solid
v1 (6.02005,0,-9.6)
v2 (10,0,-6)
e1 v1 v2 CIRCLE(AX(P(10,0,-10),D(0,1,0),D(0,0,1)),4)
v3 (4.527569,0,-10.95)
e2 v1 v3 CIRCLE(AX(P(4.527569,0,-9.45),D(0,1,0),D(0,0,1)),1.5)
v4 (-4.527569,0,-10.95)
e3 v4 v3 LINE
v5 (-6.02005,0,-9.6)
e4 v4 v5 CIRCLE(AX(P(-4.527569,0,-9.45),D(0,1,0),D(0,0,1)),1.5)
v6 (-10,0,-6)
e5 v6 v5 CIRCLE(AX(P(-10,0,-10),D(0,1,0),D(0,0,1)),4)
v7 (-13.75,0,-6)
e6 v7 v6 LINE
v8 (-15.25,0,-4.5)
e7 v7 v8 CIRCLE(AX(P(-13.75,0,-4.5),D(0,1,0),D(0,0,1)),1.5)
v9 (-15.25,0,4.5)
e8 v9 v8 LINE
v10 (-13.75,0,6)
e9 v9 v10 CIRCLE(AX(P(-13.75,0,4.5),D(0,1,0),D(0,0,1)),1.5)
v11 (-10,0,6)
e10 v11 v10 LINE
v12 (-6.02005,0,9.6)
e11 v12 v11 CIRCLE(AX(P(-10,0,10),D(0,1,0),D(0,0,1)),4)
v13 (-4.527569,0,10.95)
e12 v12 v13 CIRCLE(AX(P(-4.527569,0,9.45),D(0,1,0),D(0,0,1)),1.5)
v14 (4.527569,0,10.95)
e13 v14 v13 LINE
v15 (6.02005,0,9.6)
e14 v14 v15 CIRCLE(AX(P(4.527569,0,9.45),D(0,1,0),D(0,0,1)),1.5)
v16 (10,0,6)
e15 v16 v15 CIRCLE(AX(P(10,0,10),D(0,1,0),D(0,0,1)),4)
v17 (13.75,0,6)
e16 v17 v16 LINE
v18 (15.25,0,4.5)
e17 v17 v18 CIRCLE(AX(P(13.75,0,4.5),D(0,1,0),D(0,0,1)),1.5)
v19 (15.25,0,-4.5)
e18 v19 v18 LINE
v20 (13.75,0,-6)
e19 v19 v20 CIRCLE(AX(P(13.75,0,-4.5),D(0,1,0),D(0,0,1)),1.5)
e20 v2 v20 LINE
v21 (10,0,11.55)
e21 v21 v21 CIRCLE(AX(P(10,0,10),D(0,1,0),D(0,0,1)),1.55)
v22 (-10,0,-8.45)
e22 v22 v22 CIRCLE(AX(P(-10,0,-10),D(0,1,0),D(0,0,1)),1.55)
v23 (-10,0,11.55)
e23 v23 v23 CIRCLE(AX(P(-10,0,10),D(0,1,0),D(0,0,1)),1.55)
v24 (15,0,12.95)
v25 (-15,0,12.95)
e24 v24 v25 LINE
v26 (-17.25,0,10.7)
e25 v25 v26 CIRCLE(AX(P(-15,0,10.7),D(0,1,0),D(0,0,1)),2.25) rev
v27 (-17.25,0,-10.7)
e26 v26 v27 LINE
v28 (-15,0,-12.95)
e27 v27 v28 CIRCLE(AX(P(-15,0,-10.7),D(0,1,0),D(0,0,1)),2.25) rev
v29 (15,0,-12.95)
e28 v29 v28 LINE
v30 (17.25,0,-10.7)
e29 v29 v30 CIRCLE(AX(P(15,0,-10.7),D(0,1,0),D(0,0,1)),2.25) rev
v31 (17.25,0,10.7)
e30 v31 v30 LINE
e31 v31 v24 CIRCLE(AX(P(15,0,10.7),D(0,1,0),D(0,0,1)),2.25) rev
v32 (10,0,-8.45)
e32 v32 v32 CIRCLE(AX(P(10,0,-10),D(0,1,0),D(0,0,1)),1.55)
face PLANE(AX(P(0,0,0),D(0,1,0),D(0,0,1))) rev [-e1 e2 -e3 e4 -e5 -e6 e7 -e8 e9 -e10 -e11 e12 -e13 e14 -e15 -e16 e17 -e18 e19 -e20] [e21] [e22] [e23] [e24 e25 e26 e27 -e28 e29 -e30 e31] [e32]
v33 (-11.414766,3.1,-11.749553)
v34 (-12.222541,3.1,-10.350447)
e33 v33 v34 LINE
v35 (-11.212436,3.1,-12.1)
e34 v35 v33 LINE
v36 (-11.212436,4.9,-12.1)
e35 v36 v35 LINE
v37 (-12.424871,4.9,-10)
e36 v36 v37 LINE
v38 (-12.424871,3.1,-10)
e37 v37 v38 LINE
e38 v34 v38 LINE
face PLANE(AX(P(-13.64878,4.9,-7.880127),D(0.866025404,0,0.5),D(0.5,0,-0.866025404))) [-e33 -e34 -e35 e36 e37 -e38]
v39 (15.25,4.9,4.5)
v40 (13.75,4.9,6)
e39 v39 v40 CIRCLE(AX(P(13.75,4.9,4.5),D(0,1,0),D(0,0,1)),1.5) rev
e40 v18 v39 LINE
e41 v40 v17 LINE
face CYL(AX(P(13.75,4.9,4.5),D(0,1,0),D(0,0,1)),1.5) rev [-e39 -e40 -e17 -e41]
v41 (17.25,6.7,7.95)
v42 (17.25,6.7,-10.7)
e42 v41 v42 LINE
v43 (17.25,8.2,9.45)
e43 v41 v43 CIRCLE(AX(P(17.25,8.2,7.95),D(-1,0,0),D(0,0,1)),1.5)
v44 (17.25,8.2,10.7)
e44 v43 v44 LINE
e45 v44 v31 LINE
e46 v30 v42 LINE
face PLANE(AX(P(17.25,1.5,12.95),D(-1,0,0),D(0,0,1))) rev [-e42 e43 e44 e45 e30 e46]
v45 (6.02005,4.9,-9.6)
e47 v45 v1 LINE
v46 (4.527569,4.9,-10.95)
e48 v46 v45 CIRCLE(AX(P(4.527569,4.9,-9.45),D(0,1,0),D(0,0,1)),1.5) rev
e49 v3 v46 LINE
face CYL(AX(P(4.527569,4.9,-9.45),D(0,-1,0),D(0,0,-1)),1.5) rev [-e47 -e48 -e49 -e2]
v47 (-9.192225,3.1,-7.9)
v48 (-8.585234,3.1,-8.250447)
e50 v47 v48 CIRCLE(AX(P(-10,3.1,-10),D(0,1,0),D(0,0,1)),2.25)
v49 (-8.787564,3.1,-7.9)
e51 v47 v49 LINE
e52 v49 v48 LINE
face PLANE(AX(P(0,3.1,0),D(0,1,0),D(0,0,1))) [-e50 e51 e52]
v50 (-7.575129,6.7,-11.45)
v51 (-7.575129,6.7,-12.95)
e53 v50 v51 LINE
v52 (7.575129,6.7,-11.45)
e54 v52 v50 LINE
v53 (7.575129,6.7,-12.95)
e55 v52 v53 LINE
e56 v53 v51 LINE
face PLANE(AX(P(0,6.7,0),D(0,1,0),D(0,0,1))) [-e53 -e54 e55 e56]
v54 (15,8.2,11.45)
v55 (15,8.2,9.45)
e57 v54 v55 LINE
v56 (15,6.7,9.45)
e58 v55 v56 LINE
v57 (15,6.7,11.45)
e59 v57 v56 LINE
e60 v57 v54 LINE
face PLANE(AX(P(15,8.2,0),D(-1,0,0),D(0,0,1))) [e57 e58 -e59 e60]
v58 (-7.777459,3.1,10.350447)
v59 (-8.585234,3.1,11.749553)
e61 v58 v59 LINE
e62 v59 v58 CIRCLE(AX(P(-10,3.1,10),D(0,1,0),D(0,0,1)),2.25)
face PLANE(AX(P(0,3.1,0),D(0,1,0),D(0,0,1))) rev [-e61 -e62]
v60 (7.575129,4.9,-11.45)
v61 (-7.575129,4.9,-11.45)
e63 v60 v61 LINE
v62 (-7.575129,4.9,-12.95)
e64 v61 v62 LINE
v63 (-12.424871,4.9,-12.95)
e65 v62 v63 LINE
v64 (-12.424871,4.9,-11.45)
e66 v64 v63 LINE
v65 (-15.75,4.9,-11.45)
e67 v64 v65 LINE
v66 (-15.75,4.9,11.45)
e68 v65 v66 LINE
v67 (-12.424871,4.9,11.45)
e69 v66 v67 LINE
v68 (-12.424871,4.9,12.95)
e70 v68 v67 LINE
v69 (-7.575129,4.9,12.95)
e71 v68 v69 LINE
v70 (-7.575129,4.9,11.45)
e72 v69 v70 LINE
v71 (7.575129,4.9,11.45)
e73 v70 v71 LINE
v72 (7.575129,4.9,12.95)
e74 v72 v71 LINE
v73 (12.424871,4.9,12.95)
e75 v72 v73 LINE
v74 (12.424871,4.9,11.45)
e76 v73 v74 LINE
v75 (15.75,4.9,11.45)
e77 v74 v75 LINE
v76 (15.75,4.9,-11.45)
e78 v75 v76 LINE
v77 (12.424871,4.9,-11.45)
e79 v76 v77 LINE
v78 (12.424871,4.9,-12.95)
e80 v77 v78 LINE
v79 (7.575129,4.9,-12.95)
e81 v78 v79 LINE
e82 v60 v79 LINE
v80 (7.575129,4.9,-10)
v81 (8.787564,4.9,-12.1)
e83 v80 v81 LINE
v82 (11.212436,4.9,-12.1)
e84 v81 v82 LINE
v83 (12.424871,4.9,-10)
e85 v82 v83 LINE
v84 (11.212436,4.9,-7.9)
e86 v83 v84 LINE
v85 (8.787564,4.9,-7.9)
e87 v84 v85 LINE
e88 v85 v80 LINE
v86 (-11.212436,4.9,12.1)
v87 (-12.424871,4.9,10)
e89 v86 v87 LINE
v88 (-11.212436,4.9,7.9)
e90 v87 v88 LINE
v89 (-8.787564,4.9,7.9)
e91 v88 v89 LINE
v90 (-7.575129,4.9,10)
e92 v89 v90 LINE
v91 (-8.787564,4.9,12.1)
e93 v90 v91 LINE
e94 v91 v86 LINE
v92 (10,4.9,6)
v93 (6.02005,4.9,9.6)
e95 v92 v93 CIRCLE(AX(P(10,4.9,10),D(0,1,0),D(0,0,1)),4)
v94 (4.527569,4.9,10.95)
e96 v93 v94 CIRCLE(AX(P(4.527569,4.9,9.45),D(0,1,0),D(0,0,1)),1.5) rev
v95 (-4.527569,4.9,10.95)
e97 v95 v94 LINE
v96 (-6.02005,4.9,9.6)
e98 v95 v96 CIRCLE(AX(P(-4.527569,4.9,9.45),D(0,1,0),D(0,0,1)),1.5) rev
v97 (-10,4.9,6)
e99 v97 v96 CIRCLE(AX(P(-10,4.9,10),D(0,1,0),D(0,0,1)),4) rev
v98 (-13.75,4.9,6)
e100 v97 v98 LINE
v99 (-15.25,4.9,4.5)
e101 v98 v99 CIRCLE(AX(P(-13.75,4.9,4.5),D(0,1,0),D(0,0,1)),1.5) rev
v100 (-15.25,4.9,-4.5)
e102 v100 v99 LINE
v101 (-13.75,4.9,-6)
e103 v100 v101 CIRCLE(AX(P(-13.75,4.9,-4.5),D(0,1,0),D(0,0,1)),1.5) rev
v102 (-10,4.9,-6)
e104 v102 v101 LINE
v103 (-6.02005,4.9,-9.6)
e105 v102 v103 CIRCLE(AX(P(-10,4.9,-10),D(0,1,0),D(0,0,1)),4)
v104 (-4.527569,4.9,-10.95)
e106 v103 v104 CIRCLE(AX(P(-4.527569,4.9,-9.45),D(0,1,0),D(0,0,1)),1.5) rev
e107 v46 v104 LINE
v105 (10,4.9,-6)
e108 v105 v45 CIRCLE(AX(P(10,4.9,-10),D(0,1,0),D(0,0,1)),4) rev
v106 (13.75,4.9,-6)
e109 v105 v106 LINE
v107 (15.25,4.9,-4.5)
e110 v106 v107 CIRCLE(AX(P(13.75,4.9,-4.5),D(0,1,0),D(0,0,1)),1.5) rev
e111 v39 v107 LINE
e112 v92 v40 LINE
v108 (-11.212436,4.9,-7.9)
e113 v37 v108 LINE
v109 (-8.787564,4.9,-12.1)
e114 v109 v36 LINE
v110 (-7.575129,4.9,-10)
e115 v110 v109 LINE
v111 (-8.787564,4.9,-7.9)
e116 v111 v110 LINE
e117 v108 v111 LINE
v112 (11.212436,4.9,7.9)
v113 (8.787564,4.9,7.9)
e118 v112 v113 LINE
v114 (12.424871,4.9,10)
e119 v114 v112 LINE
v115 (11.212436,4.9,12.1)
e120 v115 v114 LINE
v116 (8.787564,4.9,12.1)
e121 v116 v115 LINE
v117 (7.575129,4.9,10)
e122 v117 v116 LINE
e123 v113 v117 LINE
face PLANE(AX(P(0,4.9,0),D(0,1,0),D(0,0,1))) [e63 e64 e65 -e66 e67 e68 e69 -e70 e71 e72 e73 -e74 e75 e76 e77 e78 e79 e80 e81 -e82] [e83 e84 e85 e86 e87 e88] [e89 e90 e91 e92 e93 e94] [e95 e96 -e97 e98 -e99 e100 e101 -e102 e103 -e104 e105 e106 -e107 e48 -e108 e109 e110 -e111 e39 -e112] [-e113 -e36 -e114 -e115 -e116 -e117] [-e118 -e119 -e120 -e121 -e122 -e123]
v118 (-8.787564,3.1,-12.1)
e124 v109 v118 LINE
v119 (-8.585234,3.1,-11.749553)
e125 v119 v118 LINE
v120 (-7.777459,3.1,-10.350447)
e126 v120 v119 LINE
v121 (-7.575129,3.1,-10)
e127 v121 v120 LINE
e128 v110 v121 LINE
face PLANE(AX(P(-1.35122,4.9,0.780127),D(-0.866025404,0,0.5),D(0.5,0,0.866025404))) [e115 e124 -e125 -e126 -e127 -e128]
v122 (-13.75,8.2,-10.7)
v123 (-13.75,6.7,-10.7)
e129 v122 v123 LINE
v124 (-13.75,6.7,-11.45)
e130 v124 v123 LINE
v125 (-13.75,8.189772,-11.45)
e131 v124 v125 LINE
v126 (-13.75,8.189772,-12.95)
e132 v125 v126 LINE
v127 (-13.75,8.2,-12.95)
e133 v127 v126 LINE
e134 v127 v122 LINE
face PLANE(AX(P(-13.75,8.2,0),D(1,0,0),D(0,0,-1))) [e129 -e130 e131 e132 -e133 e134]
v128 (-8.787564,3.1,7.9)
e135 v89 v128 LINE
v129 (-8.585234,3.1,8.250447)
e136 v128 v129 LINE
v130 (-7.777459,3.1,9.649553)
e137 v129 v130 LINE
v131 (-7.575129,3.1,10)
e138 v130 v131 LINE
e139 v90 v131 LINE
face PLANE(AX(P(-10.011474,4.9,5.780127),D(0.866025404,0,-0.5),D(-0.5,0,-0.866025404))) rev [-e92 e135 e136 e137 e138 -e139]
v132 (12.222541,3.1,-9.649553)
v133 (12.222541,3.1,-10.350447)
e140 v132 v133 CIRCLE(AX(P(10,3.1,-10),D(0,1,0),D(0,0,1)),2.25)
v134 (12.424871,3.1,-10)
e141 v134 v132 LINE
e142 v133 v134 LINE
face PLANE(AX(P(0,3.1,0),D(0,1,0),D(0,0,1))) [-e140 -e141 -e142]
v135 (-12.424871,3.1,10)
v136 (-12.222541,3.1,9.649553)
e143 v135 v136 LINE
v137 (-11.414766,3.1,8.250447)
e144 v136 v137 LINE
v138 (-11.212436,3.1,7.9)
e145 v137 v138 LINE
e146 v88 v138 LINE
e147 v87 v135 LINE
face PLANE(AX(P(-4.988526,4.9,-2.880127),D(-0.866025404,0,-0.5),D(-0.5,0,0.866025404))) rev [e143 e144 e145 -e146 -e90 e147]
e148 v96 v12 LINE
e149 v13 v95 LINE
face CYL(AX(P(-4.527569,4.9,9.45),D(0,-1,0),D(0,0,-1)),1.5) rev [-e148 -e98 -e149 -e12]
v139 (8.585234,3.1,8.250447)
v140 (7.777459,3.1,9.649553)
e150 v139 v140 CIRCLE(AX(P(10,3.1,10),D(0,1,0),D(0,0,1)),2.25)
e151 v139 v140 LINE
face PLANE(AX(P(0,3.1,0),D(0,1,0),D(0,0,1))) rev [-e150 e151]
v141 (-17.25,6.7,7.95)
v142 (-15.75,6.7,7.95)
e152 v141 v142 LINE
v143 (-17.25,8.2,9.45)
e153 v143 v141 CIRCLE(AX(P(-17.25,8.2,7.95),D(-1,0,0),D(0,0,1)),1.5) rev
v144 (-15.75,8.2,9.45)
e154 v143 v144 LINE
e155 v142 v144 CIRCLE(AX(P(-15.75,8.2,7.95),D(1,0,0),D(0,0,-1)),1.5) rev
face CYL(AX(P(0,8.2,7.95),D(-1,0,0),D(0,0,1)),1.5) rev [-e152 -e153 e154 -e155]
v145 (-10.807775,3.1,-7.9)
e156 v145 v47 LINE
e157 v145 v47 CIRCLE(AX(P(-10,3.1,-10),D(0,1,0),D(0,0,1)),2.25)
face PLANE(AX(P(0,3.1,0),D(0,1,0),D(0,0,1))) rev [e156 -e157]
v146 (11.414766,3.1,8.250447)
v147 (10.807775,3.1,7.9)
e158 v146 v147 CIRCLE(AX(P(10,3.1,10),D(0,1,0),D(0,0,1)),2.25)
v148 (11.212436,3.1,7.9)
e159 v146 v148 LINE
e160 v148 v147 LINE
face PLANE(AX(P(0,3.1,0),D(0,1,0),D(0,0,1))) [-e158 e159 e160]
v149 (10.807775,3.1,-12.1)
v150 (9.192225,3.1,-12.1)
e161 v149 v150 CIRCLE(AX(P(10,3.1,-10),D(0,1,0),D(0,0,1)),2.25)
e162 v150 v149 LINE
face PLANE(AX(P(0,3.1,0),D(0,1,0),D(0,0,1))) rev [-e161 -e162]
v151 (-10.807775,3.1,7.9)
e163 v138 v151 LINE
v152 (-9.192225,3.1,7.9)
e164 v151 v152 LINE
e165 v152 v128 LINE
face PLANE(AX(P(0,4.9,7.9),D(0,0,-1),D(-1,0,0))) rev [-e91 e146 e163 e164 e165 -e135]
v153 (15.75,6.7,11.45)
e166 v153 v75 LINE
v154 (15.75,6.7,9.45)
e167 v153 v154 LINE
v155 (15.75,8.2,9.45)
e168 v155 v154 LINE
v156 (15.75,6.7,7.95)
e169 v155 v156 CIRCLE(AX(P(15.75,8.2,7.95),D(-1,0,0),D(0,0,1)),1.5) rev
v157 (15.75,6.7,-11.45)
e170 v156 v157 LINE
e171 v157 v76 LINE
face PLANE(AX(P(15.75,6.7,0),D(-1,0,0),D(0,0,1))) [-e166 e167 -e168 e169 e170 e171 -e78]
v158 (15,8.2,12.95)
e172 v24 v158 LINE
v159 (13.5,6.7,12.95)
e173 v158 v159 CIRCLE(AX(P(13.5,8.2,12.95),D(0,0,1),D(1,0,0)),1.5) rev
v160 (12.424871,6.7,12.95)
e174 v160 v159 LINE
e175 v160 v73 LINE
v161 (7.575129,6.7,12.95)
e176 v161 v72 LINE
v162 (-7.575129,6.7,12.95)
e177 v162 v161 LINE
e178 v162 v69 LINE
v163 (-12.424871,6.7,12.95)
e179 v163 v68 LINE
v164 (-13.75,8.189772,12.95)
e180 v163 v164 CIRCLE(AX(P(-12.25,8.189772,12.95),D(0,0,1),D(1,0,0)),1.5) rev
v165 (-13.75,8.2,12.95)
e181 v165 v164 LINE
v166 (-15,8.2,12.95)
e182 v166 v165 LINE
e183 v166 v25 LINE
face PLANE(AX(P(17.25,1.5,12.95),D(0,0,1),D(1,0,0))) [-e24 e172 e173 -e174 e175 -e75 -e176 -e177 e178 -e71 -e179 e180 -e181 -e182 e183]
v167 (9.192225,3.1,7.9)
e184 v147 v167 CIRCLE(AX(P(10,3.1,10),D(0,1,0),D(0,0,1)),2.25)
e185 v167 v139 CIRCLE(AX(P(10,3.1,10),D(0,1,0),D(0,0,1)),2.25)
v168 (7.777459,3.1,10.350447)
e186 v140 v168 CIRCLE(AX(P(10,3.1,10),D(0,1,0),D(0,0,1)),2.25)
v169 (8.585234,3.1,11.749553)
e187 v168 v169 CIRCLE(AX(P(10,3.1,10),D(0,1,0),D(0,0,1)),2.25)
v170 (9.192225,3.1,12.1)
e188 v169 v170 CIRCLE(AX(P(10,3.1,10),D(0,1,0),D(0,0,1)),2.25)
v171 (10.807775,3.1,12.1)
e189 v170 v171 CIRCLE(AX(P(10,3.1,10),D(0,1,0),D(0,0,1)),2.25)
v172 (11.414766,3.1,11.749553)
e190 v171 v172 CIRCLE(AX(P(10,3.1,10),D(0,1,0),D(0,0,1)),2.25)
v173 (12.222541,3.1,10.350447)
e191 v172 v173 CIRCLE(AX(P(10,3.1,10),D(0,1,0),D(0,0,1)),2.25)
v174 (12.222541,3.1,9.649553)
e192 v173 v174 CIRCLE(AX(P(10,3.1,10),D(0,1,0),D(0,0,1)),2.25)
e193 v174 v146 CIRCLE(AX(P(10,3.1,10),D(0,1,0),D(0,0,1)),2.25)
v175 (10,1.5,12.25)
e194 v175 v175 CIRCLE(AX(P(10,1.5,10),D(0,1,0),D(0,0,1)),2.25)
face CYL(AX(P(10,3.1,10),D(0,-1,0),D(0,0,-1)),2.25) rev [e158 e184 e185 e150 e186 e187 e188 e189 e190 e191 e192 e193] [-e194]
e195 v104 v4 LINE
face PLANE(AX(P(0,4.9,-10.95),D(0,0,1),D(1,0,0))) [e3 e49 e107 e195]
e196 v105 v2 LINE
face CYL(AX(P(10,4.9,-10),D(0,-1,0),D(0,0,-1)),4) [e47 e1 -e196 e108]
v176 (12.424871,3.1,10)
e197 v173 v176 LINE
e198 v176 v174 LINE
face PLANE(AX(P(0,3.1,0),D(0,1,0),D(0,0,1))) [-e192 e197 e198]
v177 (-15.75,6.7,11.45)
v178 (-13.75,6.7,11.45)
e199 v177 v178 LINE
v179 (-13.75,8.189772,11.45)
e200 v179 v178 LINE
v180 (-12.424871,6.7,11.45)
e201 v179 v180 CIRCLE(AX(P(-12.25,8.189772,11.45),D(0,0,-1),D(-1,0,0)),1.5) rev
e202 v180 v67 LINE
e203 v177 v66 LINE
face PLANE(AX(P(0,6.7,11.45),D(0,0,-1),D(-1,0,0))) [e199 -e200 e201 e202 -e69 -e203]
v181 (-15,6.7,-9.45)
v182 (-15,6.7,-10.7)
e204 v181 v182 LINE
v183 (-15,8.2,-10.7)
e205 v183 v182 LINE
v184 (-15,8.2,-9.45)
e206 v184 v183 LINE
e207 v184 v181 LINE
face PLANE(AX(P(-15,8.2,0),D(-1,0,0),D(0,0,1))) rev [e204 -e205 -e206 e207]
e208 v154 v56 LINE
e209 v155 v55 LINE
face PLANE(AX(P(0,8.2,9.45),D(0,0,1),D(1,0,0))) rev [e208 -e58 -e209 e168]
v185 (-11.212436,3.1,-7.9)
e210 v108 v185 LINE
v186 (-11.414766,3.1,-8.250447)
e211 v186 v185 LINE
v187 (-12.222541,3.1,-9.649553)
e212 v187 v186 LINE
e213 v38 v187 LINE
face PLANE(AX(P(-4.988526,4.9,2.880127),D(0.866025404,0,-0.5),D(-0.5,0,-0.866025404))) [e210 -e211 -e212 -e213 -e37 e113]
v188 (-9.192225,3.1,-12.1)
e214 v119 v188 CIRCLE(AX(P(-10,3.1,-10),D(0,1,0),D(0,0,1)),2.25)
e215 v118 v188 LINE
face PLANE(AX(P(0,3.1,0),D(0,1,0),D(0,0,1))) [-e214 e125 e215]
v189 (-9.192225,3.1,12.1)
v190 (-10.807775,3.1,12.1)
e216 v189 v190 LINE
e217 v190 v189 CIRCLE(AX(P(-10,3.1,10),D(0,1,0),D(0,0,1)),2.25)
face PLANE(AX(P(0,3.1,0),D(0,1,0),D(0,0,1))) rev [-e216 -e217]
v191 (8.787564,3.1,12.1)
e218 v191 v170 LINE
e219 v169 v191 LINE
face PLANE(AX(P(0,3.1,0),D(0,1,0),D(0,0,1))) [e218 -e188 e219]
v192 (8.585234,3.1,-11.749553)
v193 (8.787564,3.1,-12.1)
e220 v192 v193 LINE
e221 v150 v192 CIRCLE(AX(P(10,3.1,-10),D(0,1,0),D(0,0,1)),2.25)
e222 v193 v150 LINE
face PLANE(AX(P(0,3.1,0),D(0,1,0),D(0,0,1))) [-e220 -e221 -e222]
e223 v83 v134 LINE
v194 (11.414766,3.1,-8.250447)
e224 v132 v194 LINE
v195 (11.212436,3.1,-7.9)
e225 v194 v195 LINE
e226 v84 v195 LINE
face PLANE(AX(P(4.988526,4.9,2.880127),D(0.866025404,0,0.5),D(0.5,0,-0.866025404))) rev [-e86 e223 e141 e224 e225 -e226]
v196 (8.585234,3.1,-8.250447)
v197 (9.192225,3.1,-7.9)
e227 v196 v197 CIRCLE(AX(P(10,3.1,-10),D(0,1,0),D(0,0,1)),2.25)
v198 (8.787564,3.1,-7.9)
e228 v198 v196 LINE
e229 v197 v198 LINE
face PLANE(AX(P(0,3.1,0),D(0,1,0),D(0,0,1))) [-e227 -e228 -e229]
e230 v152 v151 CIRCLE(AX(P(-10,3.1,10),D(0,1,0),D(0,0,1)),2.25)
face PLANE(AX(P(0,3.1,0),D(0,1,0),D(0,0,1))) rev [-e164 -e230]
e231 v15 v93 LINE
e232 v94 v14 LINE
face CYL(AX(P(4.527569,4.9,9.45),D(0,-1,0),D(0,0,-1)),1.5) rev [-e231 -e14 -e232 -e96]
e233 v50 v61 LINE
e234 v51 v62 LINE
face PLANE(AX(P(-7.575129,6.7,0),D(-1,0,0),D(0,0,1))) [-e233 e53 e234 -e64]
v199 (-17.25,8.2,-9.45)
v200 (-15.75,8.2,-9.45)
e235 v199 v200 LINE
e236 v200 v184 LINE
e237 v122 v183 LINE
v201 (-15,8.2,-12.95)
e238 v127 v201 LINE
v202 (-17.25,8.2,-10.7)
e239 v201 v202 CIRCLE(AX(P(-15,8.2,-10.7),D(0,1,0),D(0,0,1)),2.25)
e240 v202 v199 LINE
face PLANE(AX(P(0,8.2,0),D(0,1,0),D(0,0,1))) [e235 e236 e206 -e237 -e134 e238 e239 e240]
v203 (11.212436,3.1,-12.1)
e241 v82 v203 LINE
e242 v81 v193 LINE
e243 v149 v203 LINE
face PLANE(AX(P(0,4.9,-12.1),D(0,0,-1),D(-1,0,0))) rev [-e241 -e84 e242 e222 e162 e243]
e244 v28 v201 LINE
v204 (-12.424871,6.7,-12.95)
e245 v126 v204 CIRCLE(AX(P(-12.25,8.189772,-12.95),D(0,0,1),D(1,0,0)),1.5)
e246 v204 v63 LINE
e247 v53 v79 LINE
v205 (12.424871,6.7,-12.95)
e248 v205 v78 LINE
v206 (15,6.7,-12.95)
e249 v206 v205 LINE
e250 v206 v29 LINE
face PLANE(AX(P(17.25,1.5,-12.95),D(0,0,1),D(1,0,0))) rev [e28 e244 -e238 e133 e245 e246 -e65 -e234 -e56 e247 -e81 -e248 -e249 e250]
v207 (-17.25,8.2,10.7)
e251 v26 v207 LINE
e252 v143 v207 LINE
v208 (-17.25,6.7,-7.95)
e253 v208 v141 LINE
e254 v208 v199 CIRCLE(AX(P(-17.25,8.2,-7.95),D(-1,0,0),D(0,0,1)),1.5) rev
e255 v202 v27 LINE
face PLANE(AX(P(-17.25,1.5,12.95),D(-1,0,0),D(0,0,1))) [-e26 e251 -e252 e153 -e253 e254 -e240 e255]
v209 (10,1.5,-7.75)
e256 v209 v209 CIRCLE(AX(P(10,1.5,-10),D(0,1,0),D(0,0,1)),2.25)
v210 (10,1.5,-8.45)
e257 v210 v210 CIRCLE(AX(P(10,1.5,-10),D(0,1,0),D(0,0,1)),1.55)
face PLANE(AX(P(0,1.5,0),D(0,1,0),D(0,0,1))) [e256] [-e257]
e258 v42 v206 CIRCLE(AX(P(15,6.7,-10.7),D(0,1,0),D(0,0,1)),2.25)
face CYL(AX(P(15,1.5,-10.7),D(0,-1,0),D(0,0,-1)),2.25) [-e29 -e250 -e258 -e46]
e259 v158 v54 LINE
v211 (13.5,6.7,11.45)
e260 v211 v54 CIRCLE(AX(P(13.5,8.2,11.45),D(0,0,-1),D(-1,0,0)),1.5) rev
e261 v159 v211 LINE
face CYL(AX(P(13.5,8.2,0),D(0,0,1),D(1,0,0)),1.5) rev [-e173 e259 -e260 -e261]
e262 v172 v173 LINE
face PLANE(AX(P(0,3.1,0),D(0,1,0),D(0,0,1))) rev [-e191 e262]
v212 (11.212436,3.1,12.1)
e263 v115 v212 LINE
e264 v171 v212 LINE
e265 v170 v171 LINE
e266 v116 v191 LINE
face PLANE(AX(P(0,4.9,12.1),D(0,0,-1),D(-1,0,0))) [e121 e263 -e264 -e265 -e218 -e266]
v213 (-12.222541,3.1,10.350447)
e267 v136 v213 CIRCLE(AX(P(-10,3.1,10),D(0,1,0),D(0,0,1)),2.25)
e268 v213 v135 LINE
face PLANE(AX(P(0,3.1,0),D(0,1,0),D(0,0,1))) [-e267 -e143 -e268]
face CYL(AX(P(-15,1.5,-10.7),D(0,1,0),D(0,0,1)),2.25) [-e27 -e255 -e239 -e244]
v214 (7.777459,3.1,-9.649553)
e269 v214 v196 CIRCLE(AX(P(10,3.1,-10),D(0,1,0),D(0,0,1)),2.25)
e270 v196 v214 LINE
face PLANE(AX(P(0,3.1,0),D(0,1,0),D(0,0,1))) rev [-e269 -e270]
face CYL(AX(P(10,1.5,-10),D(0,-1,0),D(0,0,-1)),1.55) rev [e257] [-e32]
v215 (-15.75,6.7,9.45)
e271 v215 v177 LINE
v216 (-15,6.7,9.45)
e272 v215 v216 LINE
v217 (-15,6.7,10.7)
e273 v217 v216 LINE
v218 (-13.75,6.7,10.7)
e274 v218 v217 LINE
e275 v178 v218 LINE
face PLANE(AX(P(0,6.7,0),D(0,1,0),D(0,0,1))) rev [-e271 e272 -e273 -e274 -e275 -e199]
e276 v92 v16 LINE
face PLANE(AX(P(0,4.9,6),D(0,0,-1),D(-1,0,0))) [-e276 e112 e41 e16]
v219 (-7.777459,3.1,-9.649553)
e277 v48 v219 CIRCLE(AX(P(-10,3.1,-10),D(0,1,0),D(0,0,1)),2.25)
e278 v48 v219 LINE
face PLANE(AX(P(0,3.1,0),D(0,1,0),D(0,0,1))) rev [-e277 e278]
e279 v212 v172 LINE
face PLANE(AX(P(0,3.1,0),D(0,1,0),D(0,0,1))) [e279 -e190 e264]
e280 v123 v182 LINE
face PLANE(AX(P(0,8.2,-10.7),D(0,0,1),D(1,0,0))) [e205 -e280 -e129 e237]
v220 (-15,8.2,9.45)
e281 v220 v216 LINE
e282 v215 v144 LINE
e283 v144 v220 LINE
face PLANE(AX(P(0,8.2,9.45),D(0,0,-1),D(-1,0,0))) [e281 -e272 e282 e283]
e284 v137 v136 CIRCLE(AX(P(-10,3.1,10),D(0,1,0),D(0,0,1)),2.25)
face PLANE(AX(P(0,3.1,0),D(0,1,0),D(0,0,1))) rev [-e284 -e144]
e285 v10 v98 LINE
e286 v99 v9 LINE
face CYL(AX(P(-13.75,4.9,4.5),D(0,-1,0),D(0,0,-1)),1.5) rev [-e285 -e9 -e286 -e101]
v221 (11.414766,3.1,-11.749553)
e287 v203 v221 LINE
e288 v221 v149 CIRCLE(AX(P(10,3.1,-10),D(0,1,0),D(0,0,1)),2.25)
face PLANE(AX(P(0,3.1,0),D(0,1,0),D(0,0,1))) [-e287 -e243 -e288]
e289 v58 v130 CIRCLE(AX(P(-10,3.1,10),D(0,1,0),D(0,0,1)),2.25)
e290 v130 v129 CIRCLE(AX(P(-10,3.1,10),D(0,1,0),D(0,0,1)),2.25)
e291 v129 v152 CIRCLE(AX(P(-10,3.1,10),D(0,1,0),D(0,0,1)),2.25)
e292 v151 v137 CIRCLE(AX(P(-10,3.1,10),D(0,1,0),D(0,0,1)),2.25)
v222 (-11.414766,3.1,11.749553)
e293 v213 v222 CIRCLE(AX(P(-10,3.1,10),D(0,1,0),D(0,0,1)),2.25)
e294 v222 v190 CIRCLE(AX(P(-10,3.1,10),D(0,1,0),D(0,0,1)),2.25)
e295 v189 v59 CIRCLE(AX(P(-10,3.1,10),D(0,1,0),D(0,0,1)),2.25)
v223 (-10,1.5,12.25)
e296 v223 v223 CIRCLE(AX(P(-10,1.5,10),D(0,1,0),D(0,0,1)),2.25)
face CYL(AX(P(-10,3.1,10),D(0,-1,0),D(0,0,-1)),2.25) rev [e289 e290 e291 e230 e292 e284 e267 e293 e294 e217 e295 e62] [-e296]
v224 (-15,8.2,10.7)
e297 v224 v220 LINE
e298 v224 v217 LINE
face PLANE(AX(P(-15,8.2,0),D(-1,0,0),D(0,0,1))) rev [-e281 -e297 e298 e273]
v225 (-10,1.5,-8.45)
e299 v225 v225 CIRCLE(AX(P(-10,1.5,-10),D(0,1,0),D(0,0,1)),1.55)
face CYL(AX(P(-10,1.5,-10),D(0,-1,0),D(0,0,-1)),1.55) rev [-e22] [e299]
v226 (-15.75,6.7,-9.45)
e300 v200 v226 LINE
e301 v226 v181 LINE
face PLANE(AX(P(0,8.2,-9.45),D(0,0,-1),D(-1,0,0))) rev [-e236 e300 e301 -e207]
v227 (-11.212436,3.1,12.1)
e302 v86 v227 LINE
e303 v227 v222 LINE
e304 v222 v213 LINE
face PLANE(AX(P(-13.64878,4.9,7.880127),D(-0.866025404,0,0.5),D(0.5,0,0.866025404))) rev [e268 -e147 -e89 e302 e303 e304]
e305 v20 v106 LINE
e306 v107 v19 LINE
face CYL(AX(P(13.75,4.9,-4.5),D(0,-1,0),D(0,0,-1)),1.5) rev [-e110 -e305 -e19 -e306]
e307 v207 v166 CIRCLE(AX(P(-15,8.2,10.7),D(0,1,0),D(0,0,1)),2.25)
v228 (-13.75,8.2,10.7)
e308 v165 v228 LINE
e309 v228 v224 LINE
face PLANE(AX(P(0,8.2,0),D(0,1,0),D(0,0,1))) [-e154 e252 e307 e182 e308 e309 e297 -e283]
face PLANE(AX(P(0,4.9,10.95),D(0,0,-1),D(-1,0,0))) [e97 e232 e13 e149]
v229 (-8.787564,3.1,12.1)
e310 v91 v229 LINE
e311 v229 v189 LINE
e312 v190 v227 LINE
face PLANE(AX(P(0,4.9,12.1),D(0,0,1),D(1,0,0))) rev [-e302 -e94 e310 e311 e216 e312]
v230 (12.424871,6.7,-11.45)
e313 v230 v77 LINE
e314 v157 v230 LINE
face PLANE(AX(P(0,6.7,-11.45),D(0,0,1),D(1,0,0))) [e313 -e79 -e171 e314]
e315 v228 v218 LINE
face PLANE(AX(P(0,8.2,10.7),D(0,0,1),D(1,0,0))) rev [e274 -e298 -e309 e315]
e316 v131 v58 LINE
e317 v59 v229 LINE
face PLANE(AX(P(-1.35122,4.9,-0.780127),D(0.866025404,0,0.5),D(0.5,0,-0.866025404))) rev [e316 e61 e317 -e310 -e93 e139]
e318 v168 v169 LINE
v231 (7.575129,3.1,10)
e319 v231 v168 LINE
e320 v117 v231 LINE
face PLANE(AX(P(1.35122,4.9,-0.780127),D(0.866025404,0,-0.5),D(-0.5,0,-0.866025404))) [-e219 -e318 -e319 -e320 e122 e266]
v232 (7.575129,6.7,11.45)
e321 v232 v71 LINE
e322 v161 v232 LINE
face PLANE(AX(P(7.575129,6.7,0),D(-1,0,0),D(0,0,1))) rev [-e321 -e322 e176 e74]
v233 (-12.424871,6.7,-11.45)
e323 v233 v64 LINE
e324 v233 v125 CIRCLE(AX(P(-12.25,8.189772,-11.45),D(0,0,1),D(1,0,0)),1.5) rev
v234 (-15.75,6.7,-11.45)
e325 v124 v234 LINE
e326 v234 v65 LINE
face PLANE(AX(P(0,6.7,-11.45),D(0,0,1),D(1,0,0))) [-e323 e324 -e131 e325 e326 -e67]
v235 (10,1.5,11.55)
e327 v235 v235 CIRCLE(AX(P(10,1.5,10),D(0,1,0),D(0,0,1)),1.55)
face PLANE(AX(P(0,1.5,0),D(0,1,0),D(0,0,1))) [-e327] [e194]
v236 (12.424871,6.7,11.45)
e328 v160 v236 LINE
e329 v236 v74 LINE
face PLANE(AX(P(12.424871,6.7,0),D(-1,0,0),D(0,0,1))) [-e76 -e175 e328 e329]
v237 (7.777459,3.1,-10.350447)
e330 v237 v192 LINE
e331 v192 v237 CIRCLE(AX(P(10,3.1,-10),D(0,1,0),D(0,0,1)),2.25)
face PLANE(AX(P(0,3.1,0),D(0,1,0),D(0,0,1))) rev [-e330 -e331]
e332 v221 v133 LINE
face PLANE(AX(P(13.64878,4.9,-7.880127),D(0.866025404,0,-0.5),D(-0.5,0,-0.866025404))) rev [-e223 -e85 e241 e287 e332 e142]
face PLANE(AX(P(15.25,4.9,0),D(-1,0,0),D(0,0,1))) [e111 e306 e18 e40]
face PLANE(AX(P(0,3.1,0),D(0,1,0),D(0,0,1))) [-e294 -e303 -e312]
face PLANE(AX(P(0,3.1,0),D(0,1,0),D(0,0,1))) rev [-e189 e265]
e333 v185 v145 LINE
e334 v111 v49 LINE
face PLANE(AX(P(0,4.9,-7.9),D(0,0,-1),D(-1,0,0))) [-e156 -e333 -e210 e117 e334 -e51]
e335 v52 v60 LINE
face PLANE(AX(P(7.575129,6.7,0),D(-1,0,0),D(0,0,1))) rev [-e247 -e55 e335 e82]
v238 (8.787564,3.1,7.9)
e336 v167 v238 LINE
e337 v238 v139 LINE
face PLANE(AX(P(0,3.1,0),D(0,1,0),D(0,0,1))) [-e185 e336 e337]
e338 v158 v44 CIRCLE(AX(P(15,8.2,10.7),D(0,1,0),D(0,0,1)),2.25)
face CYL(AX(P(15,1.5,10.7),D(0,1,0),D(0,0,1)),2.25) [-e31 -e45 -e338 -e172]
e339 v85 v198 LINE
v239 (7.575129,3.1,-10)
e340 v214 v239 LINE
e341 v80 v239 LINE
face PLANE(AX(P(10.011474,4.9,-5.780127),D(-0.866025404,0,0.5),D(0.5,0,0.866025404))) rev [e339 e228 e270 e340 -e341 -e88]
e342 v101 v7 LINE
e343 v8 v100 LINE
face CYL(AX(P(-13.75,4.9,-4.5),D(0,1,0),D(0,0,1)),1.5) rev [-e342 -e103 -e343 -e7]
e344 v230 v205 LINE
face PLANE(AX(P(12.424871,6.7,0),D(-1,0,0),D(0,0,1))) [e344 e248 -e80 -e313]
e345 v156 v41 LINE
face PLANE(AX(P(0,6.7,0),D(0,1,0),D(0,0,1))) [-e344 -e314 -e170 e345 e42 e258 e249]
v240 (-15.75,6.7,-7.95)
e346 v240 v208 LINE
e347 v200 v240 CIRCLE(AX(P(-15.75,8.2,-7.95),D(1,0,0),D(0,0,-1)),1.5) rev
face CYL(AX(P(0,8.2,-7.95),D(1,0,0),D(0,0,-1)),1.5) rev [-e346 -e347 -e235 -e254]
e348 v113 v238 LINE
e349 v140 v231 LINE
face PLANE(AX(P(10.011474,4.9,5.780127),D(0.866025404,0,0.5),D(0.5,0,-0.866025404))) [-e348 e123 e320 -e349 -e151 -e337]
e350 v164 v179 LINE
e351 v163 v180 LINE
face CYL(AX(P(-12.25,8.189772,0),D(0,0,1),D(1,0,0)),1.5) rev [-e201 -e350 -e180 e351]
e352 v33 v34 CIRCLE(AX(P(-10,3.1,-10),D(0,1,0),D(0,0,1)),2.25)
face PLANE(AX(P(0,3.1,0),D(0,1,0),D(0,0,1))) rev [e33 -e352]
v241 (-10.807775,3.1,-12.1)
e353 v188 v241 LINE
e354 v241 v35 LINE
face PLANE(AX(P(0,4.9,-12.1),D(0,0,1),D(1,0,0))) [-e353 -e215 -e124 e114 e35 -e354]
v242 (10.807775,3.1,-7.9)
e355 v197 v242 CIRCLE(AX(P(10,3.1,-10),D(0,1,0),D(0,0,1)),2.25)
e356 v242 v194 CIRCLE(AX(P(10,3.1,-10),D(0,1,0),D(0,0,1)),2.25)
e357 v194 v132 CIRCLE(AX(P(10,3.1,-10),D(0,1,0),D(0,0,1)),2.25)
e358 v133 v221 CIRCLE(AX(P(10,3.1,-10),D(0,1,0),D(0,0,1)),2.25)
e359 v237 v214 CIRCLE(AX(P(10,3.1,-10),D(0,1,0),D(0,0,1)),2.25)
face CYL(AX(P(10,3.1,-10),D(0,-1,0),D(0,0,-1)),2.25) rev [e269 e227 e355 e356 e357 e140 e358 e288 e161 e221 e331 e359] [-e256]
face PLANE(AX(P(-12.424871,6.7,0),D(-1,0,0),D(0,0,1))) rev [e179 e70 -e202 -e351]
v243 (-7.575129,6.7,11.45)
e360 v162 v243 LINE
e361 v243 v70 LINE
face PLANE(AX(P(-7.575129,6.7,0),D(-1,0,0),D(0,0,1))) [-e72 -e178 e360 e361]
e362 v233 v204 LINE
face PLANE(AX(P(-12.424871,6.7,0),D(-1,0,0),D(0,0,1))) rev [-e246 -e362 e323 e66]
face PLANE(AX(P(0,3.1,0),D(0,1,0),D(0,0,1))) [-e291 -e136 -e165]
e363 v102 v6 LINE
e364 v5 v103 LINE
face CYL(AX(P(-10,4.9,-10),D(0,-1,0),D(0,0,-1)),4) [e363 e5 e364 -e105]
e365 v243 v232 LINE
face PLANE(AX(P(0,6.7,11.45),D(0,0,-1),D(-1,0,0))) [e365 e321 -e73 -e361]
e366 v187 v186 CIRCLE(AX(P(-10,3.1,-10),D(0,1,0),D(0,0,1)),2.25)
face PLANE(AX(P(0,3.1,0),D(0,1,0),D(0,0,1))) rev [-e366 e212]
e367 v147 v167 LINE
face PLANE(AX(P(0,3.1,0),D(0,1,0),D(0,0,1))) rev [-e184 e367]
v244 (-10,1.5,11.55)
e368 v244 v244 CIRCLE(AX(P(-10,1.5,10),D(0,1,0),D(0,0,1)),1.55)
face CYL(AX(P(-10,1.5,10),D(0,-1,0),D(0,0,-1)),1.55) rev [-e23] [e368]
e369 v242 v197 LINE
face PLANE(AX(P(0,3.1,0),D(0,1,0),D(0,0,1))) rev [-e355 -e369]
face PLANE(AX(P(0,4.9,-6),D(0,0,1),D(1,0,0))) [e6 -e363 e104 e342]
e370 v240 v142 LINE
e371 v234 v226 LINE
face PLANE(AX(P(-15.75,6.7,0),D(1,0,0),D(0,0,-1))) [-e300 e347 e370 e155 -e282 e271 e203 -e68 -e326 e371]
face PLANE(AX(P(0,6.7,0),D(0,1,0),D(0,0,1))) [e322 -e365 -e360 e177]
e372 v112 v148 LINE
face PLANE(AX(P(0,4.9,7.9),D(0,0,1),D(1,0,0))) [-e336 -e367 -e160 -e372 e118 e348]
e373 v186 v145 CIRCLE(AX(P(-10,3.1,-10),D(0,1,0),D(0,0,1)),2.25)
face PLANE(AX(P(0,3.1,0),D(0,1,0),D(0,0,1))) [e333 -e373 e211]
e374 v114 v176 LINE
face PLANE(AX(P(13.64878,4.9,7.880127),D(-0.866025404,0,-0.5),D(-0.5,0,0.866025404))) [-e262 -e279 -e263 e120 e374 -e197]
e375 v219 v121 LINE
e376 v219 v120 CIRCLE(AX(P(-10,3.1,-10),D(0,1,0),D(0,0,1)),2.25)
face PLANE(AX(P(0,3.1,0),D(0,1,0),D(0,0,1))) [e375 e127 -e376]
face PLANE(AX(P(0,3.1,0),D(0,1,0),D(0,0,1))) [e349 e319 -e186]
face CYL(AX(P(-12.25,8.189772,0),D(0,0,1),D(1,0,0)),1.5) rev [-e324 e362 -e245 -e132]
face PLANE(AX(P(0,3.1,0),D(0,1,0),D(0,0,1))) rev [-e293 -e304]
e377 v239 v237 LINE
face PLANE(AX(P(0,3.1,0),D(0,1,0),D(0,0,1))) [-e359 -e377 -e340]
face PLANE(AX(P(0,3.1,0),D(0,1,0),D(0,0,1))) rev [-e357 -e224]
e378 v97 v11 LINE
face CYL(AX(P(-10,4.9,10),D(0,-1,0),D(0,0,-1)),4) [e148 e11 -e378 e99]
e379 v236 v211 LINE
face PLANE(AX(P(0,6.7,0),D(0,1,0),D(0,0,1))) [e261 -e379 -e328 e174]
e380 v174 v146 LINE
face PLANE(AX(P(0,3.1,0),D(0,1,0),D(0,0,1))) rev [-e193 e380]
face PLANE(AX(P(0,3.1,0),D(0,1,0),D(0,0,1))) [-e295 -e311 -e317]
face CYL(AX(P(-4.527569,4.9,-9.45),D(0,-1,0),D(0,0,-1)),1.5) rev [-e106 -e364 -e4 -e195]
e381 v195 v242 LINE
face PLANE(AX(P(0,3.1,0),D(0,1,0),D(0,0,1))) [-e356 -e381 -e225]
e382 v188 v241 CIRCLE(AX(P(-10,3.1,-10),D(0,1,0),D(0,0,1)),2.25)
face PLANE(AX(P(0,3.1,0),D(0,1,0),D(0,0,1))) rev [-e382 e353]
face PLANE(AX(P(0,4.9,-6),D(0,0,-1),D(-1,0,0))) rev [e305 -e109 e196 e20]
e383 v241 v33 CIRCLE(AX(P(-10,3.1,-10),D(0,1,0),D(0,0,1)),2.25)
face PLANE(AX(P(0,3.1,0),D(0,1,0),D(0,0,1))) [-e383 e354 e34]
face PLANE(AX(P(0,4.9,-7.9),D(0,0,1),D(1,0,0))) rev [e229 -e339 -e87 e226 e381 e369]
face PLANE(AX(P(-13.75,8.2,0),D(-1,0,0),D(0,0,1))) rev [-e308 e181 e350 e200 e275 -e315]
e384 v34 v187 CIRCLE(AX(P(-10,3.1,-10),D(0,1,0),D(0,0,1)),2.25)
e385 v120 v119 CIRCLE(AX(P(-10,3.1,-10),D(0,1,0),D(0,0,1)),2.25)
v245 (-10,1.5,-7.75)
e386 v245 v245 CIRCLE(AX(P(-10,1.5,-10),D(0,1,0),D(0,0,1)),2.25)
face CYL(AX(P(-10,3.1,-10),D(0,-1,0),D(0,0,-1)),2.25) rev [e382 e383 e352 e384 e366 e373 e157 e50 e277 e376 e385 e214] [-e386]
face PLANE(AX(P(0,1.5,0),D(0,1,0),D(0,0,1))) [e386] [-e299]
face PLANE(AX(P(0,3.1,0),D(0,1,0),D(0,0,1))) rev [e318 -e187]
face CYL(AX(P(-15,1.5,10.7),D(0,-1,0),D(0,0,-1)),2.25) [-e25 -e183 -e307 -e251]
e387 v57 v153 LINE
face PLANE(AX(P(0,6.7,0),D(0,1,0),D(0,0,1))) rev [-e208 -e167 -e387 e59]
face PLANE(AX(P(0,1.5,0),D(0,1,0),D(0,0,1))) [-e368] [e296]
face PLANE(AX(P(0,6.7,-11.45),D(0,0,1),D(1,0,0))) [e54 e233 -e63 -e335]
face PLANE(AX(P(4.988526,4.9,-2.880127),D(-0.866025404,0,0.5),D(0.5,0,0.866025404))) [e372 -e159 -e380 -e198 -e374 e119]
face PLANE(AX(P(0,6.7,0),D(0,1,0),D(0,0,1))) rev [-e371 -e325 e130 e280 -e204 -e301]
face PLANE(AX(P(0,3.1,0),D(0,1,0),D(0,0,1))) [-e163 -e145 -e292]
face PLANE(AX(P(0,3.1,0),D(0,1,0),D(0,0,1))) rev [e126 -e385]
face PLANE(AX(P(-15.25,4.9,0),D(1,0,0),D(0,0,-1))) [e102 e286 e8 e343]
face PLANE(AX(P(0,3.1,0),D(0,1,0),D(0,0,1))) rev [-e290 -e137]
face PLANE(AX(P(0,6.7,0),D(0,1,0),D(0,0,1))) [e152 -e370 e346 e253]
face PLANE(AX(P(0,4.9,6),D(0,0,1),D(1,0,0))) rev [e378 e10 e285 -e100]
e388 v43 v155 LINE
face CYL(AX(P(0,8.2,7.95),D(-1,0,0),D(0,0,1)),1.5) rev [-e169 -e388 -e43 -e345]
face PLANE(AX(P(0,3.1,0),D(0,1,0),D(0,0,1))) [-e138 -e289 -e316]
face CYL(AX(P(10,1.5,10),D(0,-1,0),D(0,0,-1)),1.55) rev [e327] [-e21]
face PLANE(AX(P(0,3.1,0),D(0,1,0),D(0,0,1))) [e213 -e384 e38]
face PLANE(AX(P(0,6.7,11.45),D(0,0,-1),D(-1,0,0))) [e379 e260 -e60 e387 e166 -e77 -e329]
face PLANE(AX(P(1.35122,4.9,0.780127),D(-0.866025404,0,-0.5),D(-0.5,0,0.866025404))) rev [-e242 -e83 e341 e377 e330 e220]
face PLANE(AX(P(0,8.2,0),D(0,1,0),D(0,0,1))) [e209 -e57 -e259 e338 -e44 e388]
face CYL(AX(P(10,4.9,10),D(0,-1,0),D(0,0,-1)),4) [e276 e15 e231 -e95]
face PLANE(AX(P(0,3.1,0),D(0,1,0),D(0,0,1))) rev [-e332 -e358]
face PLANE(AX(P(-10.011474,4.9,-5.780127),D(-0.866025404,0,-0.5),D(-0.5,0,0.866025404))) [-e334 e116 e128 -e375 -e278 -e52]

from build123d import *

# Parameters (mm, degrees)
SKETCH1_W           = 34.5
SKETCH1_H           = 25.9
SKETCH1_R           = 1.55
BOSS_EXTRUDE1_DEPTH = 1.5
SKETCH3_W           = 34.5
SKETCH3_H           = 25.9
SKETCH3_R           = 2.25
BOSS_EXTRUDE3_DEPTH = 1.6
SKETCH5_W           = 34.5
SKETCH5_H           = 25.9
BOSS_EXTRUDE4_DEPTH = 1.8
SKETCH6_W           = 15.150257738
SKETCH6_H           = 1.5
BOSS_EXTRUDE5_DEPTH = 1.8
BOSS_EXTRUDE6_DEPTH = 1.5
CUT_EXTRUDE1_REACH  = 24.165
FILLET1_R           = 1.5
FILLET2_R           = 2.25


with BuildPart() as part:
    # Sketch1 → Boss-Extrude1 (new body)
    with BuildSketch(Plane(origin=(0, 0, 0), x_dir=(1, 0, 0), z_dir=(0, 1, 0))):
        Rectangle(SKETCH1_W, SKETCH1_H)
        with Locations(Location((-10, 10, 0), (0, 0, 270))):
            Circle(SKETCH1_R, mode=Mode.SUBTRACT)
        with Locations(Location((10, 10, 0), (0, 0, 270))):
            Circle(SKETCH1_R, mode=Mode.SUBTRACT)
        with Locations(Location((10, -10, 0), (0, 0, 270))):
            Circle(SKETCH1_R, mode=Mode.SUBTRACT)
        with Locations(Location((-10, -10, 0), (0, 0, 270))):
            Circle(SKETCH1_R, mode=Mode.SUBTRACT)
    extrude(amount=BOSS_EXTRUDE1_DEPTH)

    # Sketch3 → Boss-Extrude3 (add)
    with BuildSketch(Plane(origin=(0, 1.5, 0), x_dir=(1, 0, 0), z_dir=(0, 1, 0))):
        Rectangle(SKETCH3_W, SKETCH3_H)
        with Locations(Location((-10, 10, 0), (0, 0, 270))):
            Circle(SKETCH3_R, mode=Mode.SUBTRACT)
        with Locations(Location((10, 10, 0), (0, 0, 270))):
            Circle(SKETCH3_R, mode=Mode.SUBTRACT)
        with Locations(Location((10, -10, 0), (0, 0, 270))):
            Circle(SKETCH3_R, mode=Mode.SUBTRACT)
        with Locations(Location((-10, -10, 0), (0, 0, 270))):
            Circle(SKETCH3_R, mode=Mode.SUBTRACT)
    extrude(amount=BOSS_EXTRUDE3_DEPTH)

    # Sketch5 → Boss-Extrude4 (add)
    with BuildSketch(Plane(origin=(0, 3.1, 0), x_dir=(1, 0, 0), z_dir=(0, 1, 0))):
        Rectangle(SKETCH5_W, SKETCH5_H)
        with BuildLine():
            Line((-6, -10.95), (-6, -10))
            ThreePointArc((-6, -10), (-7.171572875, -7.171572875), (-10, -6))
            Line((-10, -6), (-15.25, -6))
            Line((-15.25, -6), (-15.25, 6))
            Line((-15.25, 6), (-10, 6))
            ThreePointArc((-10, 6), (-7.171572875, 7.171572875), (-6, 10))
            Line((-6, 10), (-6, 10.95))
            Line((-6, 10.95), (6, 10.95))
            Line((6, 10.95), (6, 10))
            ThreePointArc((6, 10), (7.171572875, 7.171572875), (10, 6))
            Line((10, 6), (15.25, 6))
            Line((15.25, 6), (15.25, -6))
            Line((15.25, -6), (10, -6))
            ThreePointArc((10, -6), (7.171572875, -7.171572875), (6, -10))
            Line((6, -10), (6, -10.95))
            Line((6, -10.95), (-6, -10.95))
        make_face(mode=Mode.SUBTRACT)
        Polygon((12.424871131, 10), (11.212435565, 7.9), (8.787564435, 7.9), (7.575128869, 10), (8.787564435, 12.1), (11.212435565, 12.1), align=None, mode=Mode.SUBTRACT)
        Polygon((-7.575128869, 10), (-8.787564435, 7.9), (-11.212435565, 7.9), (-12.424871131, 10), (-11.212435565, 12.1), (-8.787564435, 12.1), align=None, mode=Mode.SUBTRACT)
        Polygon((7.575128869, -10), (8.787564435, -7.9), (11.212435565, -7.9), (12.424871131, -10), (11.212435565, -12.1), (8.787564435, -12.1), align=None, mode=Mode.SUBTRACT)
        Polygon((-8.787564435, -12.1), (-11.212435565, -12.1), (-12.424871131, -10), (-11.212435565, -7.9), (-8.787564435, -7.9), (-7.575128869, -10), align=None, mode=Mode.SUBTRACT)
    extrude(amount=BOSS_EXTRUDE4_DEPTH)

    # Sketch6 → Boss-Extrude5 (add)
    with BuildSketch(Plane(origin=(0, 4.9, 0), x_dir=(1, 0, 0), z_dir=(0, 1, 0))):
        Polygon((-12.424871131, -11.45), (-15.75, -11.45), (-15.75, 11.45), (-12.424871131, 11.45), (-12.424871131, 12.95), (-17.25, 12.95), (-17.25, -12.95), (-12.424871131, -12.95), align=None)
        with Locations((0, 12.2)):
            Rectangle(SKETCH6_W, SKETCH6_H)
        Polygon((15.75, -11.45), (12.424871131, -11.45), (12.424871131, -12.95), (17.25, -12.95), (17.25, 12.95), (12.424871131, 12.95), (12.424871131, 11.45), (15.75, 11.45), align=None)
        with Locations((0, -12.2)):
            Rectangle(SKETCH6_W, SKETCH6_H)
    extrude(amount=BOSS_EXTRUDE5_DEPTH)

    # Sketch7 → Boss-Extrude6 (add)
    with BuildSketch(Plane(origin=(0, 6.7, 0), x_dir=(1, 0, 0), z_dir=(0, 1, 0))):
        Polygon((-13.75, 12.95), (-17.25, 12.95), (-17.25, 9.45), (-15.75, 9.45), (-15.75, 11.45), (-13.75, 11.45), align=None)
        Polygon((-13.75, 10.7), (-13.75, 11.45), (-15.75, 11.45), (-15.75, 9.45), (-15, 9.45), (-15, 10.7), align=None)
        Polygon((-15.75, -9.45), (-17.25, -9.45), (-17.25, -12.95), (-13.75, -12.95), (-13.75, -11.45), (-15.75, -11.45), align=None)
        Polygon((-15, -9.45), (-15.75, -9.45), (-15.75, -11.45), (-13.75, -11.45), (-13.75, -10.7), (-15, -10.7), align=None)
        Polygon((17.25, -12.95), (17.25, -9.45), (15, -9.45), (15, -10.7), (15, -12.95), align=None)
    extrude(amount=BOSS_EXTRUDE6_DEPTH)

    # Sketch8 → Cut-Extrude1 (cut, up to next)
    with BuildSketch(Plane(origin=(0, 3.1, 0), x_dir=(1, 0, 0), z_dir=(0, 1, 0)), mode=Mode.PRIVATE) as cut_extrude1_sk1:
        with BuildLine():
            Line((10, -6), (15.25, -6))
            Line((15.25, -6), (15.25, 6))
            Line((15.25, 6), (10, 6))
            ThreePointArc((10, 6), (7.171572875, 7.171572875), (6, 10))
            Line((6, 10), (6, 10.95))
            Line((6, 10.95), (-6, 10.95))
            Line((-6, 10.95), (-6, 10))
            ThreePointArc((-6, 10), (-7.171572875, 7.171572875), (-10, 6))
            Line((-10, 6), (-15.25, 6))
            Line((-15.25, 6), (-15.25, -6))
            Line((-15.25, -6), (-10, -6))
            ThreePointArc((-10, -6), (-7.171572875, -7.171572875), (-6, -10))
            Line((-6, -10), (-6, -10.95))
            Line((-6, -10.95), (6, -10.95))
            Line((6, -10.95), (6, -10))
            ThreePointArc((6, -10), (7.171572875, -7.171572875), (10, -6))
        make_face()
    cut_extrude1_tool1 = extrude(cut_extrude1_sk1.sketch, amount=-CUT_EXTRUDE1_REACH, mode=Mode.PRIVATE) & part.part
    add(cut_extrude1_tool1.solids().sort_by_distance((0, 3.1, 0))[0], mode=Mode.SUBTRACT)

    # Fillet1
    # the kernel refuses this fillet: 1.5 mm, written as the material it adds along each edge
    with BuildSketch(Plane(origin=(6, 4.9, 10.95), x_dir=(-1, 0, 0), z_dir=(0, -1, 0))) as fillet1_piece_1:
        with BuildLine():
            CenterArc((1.472430904, 1.5), FILLET1_R, 185.739170477, 84.260829523)
            Line((-0.020050252, 1.35), (-0.169298367, 1.335))
            ThreePointArc((-0.169298367, 1.335), (-0.15, 0.95), (-0.15, 0))
            Line((-0.15, 0), (0, -0.15))
            Line((0, -0.15), (1.472430904, -0.15))
            Line((1.472430904, -0.15), (1.472430904, 0))
        make_face()
    extrude(amount=4.9)
    with BuildSketch(Plane(origin=(15.25, 4.9, 6), x_dir=(-1, 0, 0), z_dir=(0, -1, 0)), Plane(origin=(15.25, 4.9, -6), x_dir=(0, 0, 1), z_dir=(0, -1, 0))) as fillet1_piece_2:
        with BuildLine():
            CenterArc((FILLET1_R, FILLET1_R), FILLET1_R, 180, 90)
            Line((0, FILLET1_R), (0, 0))
            Line((0, 0), (FILLET1_R, 0))
        make_face()
    extrude(amount=4.9)
    with BuildSketch(Plane(origin=(6, 4.9, -10.95), x_dir=(0.014850400419695863, 0, 0.9998897267235897), z_dir=(0, -1, 0))) as fillet1_piece_3:
        with BuildLine():
            CenterArc((1.477968402, 1.494544135), FILLET1_R, 180.850896545, 84.260829523)
            Line((-0.021866189, 1.472268534), (-0.171849648, 1.470040974))
            Line((-0.171849648, 1.470040974), (-0.149983459, -0.00222756))
            Line((-0.149983459, -0.00222756), (0.00222756, -0.149983459))
            ThreePointArc((0.00222756, -0.149983459), (0.9521228, -0.135875579), (1.337366934, -0.149454413))
            Line((1.337366934, -0.149454413), (1.350148885, 0))
        make_face()
    extrude(amount=4.9)
    with BuildSketch(Plane(origin=(-6, 0, -10.95), x_dir=(1, 0, 0), z_dir=(0, 1, 0))) as fillet1_piece_4:
        with BuildLine():
            CenterArc((1.472430904, -1.5), FILLET1_R, 90, 84.260829523)
            Line((-0.020050252, -1.35), (-0.169298367, -1.335))
            ThreePointArc((-0.169298367, -1.335), (-0.15, -0.95), (-0.15, 0))
            Line((-0.15, 0), (0, 0.15))
            Line((0, 0.15), (1.472430904, 0.15))
            Line((1.472430904, 0.15), (1.472430904, 0))
        make_face()
    extrude(amount=4.9)
    with BuildSketch(Plane(origin=(-15.25, 0, -6), x_dir=(1, 0, 0), z_dir=(0, 1, 0)), Plane(origin=(-15.25, 0, 6), x_dir=(0, 0, -1), z_dir=(0, 1, 0))) as fillet1_piece_5:
        with BuildLine():
            CenterArc((FILLET1_R, -FILLET1_R), FILLET1_R, 90, 90)
            Line((0, -FILLET1_R), (0, 0))
            Line((0, 0), (FILLET1_R, 0))
        make_face()
    extrude(amount=4.9)
    with BuildSketch(Plane(origin=(-6, 0, 10.95), x_dir=(-0.014850400419695205, 0, -0.9998897267235897), z_dir=(0, 1, 0))) as fillet1_piece_6:
        with BuildLine():
            CenterArc((1.477968402, -1.494544135), FILLET1_R, 94.888273932, 84.260829523)
            Line((-0.021866189, -1.472268534), (-0.171849648, -1.470040974))
            Line((-0.171849648, -1.470040974), (-0.149983459, 0.00222756))
            Line((-0.149983459, 0.00222756), (0.00222756, 0.149983459))
            ThreePointArc((0.00222756, 0.149983459), (0.9521228, 0.135875579), (1.337366934, 0.149454413))
            Line((1.337366934, 0.149454413), (1.350148885, 0))
        make_face()
    extrude(amount=4.9)
    with BuildSketch(Plane(origin=(17.25, 6.7, 9.45), x_dir=(0, 0, -1), z_dir=(-1, 0, 0)), Plane(origin=(15, 6.7, 11.45), x_dir=(-1, 0, 0), z_dir=(0, 0, 1)), Plane(origin=(-15.75, 6.7, 9.45), x_dir=(0, 0, -1), z_dir=(-1, 0, 0)), Plane(origin=(-15.75, 6.7, -9.45), x_dir=(0, 1, 0), z_dir=(-1, 0, 0))) as fillet1_piece_7:
        with BuildLine():
            CenterArc((FILLET1_R, -FILLET1_R), FILLET1_R, 90, 90)
            Line((0, -FILLET1_R), (0, 0))
            Line((0, 0), (FILLET1_R, 0))
        make_face()
    extrude(amount=1.5)
    with BuildSketch(Plane(origin=(-13.75, 6.7, -11.45), x_dir=(1, 0, 0), z_dir=(0, 0, -1))) as fillet1_piece_8:
        with BuildLine():
            CenterArc((1.5, -1.489771824), FILLET1_R, 96.694808908, 83.305191092)
            Line((0, -1.489771824), (0, 0))
            Line((0, 0), (1.325128869, 0))
        make_face()
    extrude(amount=1.5)
    with BuildSketch(Plane(origin=(-13.75, 6.7, 11.45), x_dir=(0, 1, 0), z_dir=(0, 0, 1))) as fillet1_piece_9:
        with BuildLine():
            CenterArc((1.489771824, -1.5), FILLET1_R, 90, 83.305191092)
            Line((0, -1.325128869), (0, 0))
            Line((0, 0), (1.489771824, 0))
        make_face()
    extrude(amount=1.5)

    # Fillet2
    fillet2_edges = [part.edges().sort_by_distance(p)[0] for p in [
        (17.25, 4.1, 12.95),
        (-17.25, 4.1, 12.95),
        (-17.25, 4.1, -12.95),
        (17.25, 3.35, -12.95),
    ]]
    fillet(fillet2_edges, radius=FILLET2_R)


solid = part.part
